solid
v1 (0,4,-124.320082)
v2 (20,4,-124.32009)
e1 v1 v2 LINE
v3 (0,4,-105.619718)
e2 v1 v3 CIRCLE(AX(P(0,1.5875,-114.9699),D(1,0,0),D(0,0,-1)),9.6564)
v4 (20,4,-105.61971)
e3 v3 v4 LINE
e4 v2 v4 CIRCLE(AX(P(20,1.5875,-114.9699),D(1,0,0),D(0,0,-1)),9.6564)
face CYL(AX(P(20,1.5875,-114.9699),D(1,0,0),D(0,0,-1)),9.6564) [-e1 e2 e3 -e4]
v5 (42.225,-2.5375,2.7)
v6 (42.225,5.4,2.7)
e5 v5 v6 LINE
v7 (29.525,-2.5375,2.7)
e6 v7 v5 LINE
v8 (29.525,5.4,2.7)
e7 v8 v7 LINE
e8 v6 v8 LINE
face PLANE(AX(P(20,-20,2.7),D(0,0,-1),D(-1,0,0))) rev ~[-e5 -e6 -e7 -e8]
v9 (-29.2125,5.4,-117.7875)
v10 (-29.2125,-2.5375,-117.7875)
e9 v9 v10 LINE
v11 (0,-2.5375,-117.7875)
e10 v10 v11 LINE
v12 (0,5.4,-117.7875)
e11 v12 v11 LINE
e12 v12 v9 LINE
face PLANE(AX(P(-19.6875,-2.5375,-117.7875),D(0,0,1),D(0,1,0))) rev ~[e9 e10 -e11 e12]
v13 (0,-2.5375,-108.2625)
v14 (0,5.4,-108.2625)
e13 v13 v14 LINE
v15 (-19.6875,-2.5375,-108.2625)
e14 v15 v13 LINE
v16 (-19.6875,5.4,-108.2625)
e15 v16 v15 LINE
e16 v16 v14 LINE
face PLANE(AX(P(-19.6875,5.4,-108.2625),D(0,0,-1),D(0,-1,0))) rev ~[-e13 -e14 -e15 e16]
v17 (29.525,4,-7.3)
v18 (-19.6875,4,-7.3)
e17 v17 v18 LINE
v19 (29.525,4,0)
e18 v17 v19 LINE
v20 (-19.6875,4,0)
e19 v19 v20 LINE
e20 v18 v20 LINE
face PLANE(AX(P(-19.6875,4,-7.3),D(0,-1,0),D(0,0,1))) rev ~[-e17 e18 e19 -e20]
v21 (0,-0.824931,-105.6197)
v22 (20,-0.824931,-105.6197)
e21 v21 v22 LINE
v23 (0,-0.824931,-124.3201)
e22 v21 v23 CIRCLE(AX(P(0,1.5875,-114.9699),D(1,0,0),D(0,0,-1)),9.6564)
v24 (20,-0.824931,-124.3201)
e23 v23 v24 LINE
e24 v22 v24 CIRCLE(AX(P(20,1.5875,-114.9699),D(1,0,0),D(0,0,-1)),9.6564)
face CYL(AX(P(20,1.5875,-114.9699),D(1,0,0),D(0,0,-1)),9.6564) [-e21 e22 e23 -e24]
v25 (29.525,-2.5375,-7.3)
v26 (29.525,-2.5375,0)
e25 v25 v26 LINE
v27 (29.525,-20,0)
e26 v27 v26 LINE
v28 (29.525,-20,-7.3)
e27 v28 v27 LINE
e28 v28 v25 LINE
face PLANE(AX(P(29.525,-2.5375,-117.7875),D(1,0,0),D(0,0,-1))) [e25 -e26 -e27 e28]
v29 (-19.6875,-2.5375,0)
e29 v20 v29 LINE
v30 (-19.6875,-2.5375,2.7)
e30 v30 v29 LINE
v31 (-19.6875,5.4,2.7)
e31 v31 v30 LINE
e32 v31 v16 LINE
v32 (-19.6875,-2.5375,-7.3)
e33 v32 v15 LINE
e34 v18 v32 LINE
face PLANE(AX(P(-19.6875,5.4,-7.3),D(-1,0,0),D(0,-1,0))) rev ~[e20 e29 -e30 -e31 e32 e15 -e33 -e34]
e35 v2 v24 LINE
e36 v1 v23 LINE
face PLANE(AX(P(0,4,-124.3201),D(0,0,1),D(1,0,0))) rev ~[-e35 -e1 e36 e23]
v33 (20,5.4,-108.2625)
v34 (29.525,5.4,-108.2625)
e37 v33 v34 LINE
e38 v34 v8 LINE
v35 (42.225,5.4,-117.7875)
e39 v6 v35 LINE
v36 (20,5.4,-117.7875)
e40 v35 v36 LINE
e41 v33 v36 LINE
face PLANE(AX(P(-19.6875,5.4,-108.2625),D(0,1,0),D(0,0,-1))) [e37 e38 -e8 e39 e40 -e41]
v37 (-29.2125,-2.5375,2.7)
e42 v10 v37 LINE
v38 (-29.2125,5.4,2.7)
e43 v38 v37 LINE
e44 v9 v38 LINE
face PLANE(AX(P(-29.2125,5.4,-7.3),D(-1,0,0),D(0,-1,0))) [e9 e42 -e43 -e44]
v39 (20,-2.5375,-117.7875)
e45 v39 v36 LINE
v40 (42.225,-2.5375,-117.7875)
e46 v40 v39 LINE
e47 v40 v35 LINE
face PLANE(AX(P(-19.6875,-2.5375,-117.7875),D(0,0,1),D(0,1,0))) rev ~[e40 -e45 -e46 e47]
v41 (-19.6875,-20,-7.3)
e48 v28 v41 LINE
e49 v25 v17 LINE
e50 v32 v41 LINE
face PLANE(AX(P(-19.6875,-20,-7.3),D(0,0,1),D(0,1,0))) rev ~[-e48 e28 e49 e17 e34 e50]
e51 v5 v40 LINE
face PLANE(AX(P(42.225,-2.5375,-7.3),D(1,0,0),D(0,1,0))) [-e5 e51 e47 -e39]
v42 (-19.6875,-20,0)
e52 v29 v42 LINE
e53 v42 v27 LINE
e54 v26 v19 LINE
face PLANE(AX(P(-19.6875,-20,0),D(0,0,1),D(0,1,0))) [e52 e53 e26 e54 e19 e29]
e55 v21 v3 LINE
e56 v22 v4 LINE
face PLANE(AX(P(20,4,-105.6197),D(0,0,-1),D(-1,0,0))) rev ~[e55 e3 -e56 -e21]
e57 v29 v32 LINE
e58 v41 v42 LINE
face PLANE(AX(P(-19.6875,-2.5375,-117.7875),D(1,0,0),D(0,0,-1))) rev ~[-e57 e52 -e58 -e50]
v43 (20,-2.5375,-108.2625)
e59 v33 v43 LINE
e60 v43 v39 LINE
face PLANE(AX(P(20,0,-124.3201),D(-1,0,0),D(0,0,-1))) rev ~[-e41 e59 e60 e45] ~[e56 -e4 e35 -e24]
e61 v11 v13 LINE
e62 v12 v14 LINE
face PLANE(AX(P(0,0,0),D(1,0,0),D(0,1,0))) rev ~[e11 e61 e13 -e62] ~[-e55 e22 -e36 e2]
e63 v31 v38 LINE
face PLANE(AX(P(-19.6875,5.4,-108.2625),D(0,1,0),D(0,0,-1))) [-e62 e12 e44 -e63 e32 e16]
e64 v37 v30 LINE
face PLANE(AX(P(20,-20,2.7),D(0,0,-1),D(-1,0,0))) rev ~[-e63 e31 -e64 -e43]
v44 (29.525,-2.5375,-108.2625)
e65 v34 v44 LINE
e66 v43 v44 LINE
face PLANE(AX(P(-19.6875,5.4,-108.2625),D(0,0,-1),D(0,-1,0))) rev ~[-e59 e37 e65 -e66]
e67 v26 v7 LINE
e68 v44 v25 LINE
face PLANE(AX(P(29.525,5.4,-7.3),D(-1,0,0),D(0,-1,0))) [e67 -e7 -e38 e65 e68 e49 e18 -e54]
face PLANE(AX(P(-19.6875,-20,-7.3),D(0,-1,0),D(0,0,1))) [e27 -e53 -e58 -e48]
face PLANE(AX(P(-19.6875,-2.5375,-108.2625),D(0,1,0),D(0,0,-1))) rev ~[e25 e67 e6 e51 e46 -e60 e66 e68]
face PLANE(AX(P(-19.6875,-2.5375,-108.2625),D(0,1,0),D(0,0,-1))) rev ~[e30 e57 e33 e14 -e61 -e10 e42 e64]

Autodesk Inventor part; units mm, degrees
ref_plane "YZ Plane" through (0, 0, 0) normal (1, 0, 0) x (0, 1, 0)
ref_plane "XZ Plane" through (0, 0, 0) normal (0, 1, 0) x (-1, 0, 0)
ref_plane "XY Plane" through (0, 0, 0) normal (0, 0, 1) x (1, 0, 0)
sketch "Эскиз1" plane through (0, 0, 0) normal (1, 0, 0) x (0, 1, 0)
  line L0 (0, 0) -> (4, 0)
  line L1 (4, 0) -> (4, -125)
  line L2 (4, -125) -> (0, -125)
  line L3 (0, -125) -> (0, 0)
  dimension "d0" = 4
  dimension "d1" = 125
extrude "Выдавливание1" add sketch "Эскиз1" along normal blind 20
sketch "Эскиз2" plane through (0, 0, 0) normal (0, 0, 1) x (1, 0, 0)
  line L0 (0, 0) -> (0, 4) projected
  line L1 (0, 4) -> (-20.6542, 14.0196)
  line L2 (-20.6542, 14.0196) -> (-22.225, 10.7816)
  line L3 (-22.225, 10.7816) -> (0, 0)
  line L4 (0, 4) -> (20, 4) projected
  line L5 (0, 0) -> (20, 0) projected
  line L6 (10, 4) -> (10, 0)
  line L7 (20, 4) -> (40.6542, 14.0196)
  line L8 (40.6542, 14.0196) -> (42.225, 10.7816)
  line L9 (42.225, 10.7816) -> (20, 0)
extrude "Выдавливание2" add sketch "Эскиз2" against normal blind 20 contours L3 L2 L1 L0 | L6 L4 L7 L8 L9 L5
sketch "Эскиз3" plane through (20, 0, 0) normal (1, 0, 0) x (0, 0, -1)
  circle A0 centre (114.9699, 1.5875) radius 9.6564
  line L0 (125, 0) -> (125, 4) projected
  point P0 (0, 0)
  dimension "d16" = 10.0301
extrude "Выдавливание3" add sketch "Эскиз3" against normal blind 20
sketch "Эскиз4" plane through (0, 0, -20) normal (0, 0, -1) x (-1, 0, 0)
  line L0 (-20, 4) -> (-20, 0) projected
  line L1 (-20, 4) -> (-40.6542, 14.0196) projected
  line L2 (-40.6542, 14.0196) -> (-42.225, 10.7816) projected
  line L3 (-42.225, 10.7816) -> (-20, 0) projected
  line L4 (-40.6542, 14.0196) -> (-37.955, 12.7102)
  line L5 (-37.955, 12.7102) -> (-39.5258, 9.4722)
  line L6 (-42.225, 10.7816) -> (-39.5258, 9.4722)
  line L7 (-42.225, 10.7816) -> (-40.6542, 14.0196)
  line L8 (20.6542, 14.0196) -> (0, 4) projected
  line L9 (0, 0) -> (0, 4) projected
  line L10 (0, 0) -> (22.225, 10.7816) projected
  line L11 (22.225, 10.7816) -> (20.6542, 14.0196) projected
  line L12 (20.6542, 14.0196) -> (17.955, 12.7102)
  line L13 (17.955, 12.7102) -> (19.5258, 9.4722)
  line L14 (19.5258, 9.4722) -> (22.225, 10.7816)
  line L15 (20.6542, 14.0196) -> (22.225, 10.7816)
  dimension "d8" = 3
  dimension "d9" = 3
extrude "Выдавливание4" add sketch "Эскиз4" along normal up to surface (105 mm away) contours L5 L3 L2 L1 | L11 L10 L13 L8
sketch "Эскиз5" plane through (39.5258, 9.4722, -125) normal (0, 0, -1) x (-0.8997207, -0.436466, 0)
  line L0 (0, 3.5989) -> (0, 0) projected
  line L1 (0, 0) -> (21.7021, 0) projected
  line L2 (19.9562, 3.5989) -> (21.7021, 0) projected
  line L3 (19.9562, 3.5989) -> (0, 3.5989) projected
  line L4 (53.13, 25.7741) -> (50.3035, 28.0017) projected
  line L5 (50.3035, 28.0017) -> (37.9507, 12.3282) projected
  line L6 (39.6965, 8.7293) -> (37.9507, 12.3282) projected
  line L7 (39.6965, 8.7293) -> (53.13, 25.7741) projected
  line L8 (53.13, 25.7741) -> (50.3035, 28.0017) projected
  line L9 (54.987, 28.1302) -> (53.13, 25.7741) projected
  line L10 (52.1605, 30.3579) -> (54.987, 28.1302) projected
  line L11 (50.3035, 28.0017) -> (52.1605, 30.3579) projected
  line L12 (0, 3.5989) -> (0, 0) projected
  line L13 (-3, 3.5989) -> (0, 3.5989) projected
  line L14 (-3, 0) -> (-3, 3.5989) projected
  line L15 (0, 0) -> (-3, 0) projected
extrude "Выдавливание5" add sketch "Эскиз5" against normal blind 20 contours L3 L2 L1 L0 | L7 L6 L5 L4
sketch "Эскиз6" plane through (0, 4, 0) normal (0, 1, 0) x (1, 0, 0)
  line L0 (0, 105.6197) -> (0, 105) projected
  line L1 (0, 105) -> (0, 20) projected
  line L2 (0, 20) -> (0, 0) projected
  line L3 (0, 0) -> (20, 0) projected
  line L4 (20, 20) -> (20, 0) projected
  line L5 (20, 105) -> (20, 20) projected
  line L6 (20, 105.6197) -> (20, 105) projected
  line L7 (-19.5258, 105) -> (0, 105) projected
  line L8 (0, 105) -> (20, 105)
  line L9 (0, 20) -> (20, 20)
  line L10 (0, 125) -> (20, 125) projected
  line L11 (0, 124.3201) -> (20, 124.3201) projected
  line L12 (20, 125) -> (20, 124.3201) projected
  line L13 (0, 125) -> (0, 124.3201) projected
  line L14 (20, 105.6197) -> (0, 105.6197) projected
  point P0 (0, 0)
extrude "Выдавливание6" cut sketch "Эскиз6" against normal blind 20 contours L14 L6 L8 L0 | L8 L5 L9 L1 | L10 L12 L11 L13
sketch "Эскиз7" plane through (0, 0, -20) normal (0, -1, 0) x (1, 0, 0)
  line L0 (0, 0) -> (0, 20) projected
  line L1 (20, 0) -> (20, 20) projected
  line L2 (0, 20) -> (20, 20)
  line L3 (20, 20) -> (20, 12.7)
  line L4 (20, 12.7) -> (0, 12.7)
  line L5 (0, 12.7) -> (0, 20)
extrude "Выдавливание7" add sketch "Эскиз7" along normal blind 20
sketch "Эскиз8" plane through (0, 0, -105) normal (0, -1, 0) x (1, 0, 0)
  line L0 (20, 97.7) -> (0, 97.7) projected
  line L1 (0, 97.7) -> (0, 85) projected
  line L2 (0, 85) -> (0, 0) projected
  line L3 (0, 0) -> (20, 0) projected
  line L4 (20, 85) -> (20, 0) projected
  line L5 (20, 97.7) -> (20, 85) projected
  line L6 (39.5258, 85) -> (20, 85) projected
  line L7 (0, 85) -> (-19.5258, 85) projected
  line L8 (20, 105) -> (42.225, 105) projected
  line L9 (20, 105) -> (20, 97.7) projected
  line L10 (20, 97.7) -> (20, 85) projected
  line L11 (39.5258, 85) -> (20, 85) projected
  line L12 (39.5258, 85) -> (39.5258, 0) projected
  line L13 (20, 0) -> (39.5258, 0) projected
  line L14 (20, -0.6197) -> (20, 0) projected
  line L15 (20, -19.3201) -> (20, -0.6197) projected
  line L16 (20, -19.3201) -> (20, -20) projected
  line L17 (42.225, -20) -> (20, -20) projected
  line L18 (42.225, 105) -> (42.225, -20) projected
  line L19 (-22.225, 105) -> (0, 105) projected
  line L20 (-22.225, 105) -> (-22.225, -20) projected
  line L21 (-22.225, -20) -> (0, -20) projected
  line L22 (0, -19.3201) -> (0, -20) projected
  line L23 (0, -0.6197) -> (0, -19.3201) projected
  line L24 (0, 0) -> (0, -0.6197) projected
  line L25 (-19.5258, 0) -> (0, 0) projected
  line L26 (-19.5258, 85) -> (-19.5258, 0) projected
  line L27 (0, 85) -> (-19.5258, 85) projected
  line L28 (0, 97.7) -> (0, 85) projected
  line L29 (0, 105) -> (0, 97.7) projected
  line L30 (20, 85) -> (0, 85)
  point P0 (0, 97.7)
extrude "Выдавливание8" cut sketch "Эскиз8" against normal blind 20
sketch "Эскиз9" plane through (20, -20, -7.3) normal (0, 0, -1) x (-1, 0, 0)
  line L0 (-22.225, 25.4) -> (49.2125, 25.4)
  line L1 (49.2125, 25.4) -> (49.2125, 17.4625)
  line L2 (49.2125, 17.4625) -> (-22.225, 17.4625)
  line L3 (-22.225, 17.4625) -> (-22.225, 25.4)
  line L4 (-22.225, 25.4) -> (-9.525, 25.4)
  line L5 (-9.525, 25.4) -> (-9.525, 17.4625)
  line L6 (-9.525, 17.4625) -> (-22.225, 17.4625)
  line L7 (-22.225, 17.4625) -> (-22.225, 25.4)
  line L8 (49.2125, 25.4) -> (39.6875, 25.4)
  line L9 (39.6875, 25.4) -> (39.6875, 17.4625)
  line L10 (39.6875, 17.4625) -> (49.2125, 17.4625)
  line L11 (49.2125, 17.4625) -> (49.2125, 25.4)
  point P0 (20, 20)
extrude "Выдавливание9" add sketch "Эскиз9" along normal blind 110.4875 and the other way blind 10 contours L0 L5 L2 L3 | L0 L1 L2 L9
sketch "Эскиз10" plane through (-19.6875, -2.5375, -117.7875) normal (1, 0, 0) x (0, 0, -1)
  line L0 (-117.7875, -17.4625) -> (-117.7875, 6.5375) projected
  line L1 (-110.4875, -17.4625) -> (-117.7875, -17.4625) projected
  line L2 (-110.4875, -17.4625) -> (-110.4875, 6.5375) projected
  line L3 (-110.4875, 6.5375) -> (-117.7875, 6.5375) projected
  line L4 (-120.4875, 7.9375) -> (0, 7.9375) projected
  line L5 (-120.4875, 0) -> (0, 0) projected
  line L6 (0, 7.9375) -> (-9.525, 7.9375)
  line L7 (-9.525, 7.9375) -> (-9.525, 0)
  line L8 (-9.525, 0) -> (0, 0)
  line L9 (0, 0) -> (0, 7.9375)
  point P0 (-117.7875, 2.5375)
extrude "Выдавливание10" add sketch "Эскиз10" along normal up to surface (49.2125 mm away)
properties part number "ПАЛЬЧИК ножки врозь"
